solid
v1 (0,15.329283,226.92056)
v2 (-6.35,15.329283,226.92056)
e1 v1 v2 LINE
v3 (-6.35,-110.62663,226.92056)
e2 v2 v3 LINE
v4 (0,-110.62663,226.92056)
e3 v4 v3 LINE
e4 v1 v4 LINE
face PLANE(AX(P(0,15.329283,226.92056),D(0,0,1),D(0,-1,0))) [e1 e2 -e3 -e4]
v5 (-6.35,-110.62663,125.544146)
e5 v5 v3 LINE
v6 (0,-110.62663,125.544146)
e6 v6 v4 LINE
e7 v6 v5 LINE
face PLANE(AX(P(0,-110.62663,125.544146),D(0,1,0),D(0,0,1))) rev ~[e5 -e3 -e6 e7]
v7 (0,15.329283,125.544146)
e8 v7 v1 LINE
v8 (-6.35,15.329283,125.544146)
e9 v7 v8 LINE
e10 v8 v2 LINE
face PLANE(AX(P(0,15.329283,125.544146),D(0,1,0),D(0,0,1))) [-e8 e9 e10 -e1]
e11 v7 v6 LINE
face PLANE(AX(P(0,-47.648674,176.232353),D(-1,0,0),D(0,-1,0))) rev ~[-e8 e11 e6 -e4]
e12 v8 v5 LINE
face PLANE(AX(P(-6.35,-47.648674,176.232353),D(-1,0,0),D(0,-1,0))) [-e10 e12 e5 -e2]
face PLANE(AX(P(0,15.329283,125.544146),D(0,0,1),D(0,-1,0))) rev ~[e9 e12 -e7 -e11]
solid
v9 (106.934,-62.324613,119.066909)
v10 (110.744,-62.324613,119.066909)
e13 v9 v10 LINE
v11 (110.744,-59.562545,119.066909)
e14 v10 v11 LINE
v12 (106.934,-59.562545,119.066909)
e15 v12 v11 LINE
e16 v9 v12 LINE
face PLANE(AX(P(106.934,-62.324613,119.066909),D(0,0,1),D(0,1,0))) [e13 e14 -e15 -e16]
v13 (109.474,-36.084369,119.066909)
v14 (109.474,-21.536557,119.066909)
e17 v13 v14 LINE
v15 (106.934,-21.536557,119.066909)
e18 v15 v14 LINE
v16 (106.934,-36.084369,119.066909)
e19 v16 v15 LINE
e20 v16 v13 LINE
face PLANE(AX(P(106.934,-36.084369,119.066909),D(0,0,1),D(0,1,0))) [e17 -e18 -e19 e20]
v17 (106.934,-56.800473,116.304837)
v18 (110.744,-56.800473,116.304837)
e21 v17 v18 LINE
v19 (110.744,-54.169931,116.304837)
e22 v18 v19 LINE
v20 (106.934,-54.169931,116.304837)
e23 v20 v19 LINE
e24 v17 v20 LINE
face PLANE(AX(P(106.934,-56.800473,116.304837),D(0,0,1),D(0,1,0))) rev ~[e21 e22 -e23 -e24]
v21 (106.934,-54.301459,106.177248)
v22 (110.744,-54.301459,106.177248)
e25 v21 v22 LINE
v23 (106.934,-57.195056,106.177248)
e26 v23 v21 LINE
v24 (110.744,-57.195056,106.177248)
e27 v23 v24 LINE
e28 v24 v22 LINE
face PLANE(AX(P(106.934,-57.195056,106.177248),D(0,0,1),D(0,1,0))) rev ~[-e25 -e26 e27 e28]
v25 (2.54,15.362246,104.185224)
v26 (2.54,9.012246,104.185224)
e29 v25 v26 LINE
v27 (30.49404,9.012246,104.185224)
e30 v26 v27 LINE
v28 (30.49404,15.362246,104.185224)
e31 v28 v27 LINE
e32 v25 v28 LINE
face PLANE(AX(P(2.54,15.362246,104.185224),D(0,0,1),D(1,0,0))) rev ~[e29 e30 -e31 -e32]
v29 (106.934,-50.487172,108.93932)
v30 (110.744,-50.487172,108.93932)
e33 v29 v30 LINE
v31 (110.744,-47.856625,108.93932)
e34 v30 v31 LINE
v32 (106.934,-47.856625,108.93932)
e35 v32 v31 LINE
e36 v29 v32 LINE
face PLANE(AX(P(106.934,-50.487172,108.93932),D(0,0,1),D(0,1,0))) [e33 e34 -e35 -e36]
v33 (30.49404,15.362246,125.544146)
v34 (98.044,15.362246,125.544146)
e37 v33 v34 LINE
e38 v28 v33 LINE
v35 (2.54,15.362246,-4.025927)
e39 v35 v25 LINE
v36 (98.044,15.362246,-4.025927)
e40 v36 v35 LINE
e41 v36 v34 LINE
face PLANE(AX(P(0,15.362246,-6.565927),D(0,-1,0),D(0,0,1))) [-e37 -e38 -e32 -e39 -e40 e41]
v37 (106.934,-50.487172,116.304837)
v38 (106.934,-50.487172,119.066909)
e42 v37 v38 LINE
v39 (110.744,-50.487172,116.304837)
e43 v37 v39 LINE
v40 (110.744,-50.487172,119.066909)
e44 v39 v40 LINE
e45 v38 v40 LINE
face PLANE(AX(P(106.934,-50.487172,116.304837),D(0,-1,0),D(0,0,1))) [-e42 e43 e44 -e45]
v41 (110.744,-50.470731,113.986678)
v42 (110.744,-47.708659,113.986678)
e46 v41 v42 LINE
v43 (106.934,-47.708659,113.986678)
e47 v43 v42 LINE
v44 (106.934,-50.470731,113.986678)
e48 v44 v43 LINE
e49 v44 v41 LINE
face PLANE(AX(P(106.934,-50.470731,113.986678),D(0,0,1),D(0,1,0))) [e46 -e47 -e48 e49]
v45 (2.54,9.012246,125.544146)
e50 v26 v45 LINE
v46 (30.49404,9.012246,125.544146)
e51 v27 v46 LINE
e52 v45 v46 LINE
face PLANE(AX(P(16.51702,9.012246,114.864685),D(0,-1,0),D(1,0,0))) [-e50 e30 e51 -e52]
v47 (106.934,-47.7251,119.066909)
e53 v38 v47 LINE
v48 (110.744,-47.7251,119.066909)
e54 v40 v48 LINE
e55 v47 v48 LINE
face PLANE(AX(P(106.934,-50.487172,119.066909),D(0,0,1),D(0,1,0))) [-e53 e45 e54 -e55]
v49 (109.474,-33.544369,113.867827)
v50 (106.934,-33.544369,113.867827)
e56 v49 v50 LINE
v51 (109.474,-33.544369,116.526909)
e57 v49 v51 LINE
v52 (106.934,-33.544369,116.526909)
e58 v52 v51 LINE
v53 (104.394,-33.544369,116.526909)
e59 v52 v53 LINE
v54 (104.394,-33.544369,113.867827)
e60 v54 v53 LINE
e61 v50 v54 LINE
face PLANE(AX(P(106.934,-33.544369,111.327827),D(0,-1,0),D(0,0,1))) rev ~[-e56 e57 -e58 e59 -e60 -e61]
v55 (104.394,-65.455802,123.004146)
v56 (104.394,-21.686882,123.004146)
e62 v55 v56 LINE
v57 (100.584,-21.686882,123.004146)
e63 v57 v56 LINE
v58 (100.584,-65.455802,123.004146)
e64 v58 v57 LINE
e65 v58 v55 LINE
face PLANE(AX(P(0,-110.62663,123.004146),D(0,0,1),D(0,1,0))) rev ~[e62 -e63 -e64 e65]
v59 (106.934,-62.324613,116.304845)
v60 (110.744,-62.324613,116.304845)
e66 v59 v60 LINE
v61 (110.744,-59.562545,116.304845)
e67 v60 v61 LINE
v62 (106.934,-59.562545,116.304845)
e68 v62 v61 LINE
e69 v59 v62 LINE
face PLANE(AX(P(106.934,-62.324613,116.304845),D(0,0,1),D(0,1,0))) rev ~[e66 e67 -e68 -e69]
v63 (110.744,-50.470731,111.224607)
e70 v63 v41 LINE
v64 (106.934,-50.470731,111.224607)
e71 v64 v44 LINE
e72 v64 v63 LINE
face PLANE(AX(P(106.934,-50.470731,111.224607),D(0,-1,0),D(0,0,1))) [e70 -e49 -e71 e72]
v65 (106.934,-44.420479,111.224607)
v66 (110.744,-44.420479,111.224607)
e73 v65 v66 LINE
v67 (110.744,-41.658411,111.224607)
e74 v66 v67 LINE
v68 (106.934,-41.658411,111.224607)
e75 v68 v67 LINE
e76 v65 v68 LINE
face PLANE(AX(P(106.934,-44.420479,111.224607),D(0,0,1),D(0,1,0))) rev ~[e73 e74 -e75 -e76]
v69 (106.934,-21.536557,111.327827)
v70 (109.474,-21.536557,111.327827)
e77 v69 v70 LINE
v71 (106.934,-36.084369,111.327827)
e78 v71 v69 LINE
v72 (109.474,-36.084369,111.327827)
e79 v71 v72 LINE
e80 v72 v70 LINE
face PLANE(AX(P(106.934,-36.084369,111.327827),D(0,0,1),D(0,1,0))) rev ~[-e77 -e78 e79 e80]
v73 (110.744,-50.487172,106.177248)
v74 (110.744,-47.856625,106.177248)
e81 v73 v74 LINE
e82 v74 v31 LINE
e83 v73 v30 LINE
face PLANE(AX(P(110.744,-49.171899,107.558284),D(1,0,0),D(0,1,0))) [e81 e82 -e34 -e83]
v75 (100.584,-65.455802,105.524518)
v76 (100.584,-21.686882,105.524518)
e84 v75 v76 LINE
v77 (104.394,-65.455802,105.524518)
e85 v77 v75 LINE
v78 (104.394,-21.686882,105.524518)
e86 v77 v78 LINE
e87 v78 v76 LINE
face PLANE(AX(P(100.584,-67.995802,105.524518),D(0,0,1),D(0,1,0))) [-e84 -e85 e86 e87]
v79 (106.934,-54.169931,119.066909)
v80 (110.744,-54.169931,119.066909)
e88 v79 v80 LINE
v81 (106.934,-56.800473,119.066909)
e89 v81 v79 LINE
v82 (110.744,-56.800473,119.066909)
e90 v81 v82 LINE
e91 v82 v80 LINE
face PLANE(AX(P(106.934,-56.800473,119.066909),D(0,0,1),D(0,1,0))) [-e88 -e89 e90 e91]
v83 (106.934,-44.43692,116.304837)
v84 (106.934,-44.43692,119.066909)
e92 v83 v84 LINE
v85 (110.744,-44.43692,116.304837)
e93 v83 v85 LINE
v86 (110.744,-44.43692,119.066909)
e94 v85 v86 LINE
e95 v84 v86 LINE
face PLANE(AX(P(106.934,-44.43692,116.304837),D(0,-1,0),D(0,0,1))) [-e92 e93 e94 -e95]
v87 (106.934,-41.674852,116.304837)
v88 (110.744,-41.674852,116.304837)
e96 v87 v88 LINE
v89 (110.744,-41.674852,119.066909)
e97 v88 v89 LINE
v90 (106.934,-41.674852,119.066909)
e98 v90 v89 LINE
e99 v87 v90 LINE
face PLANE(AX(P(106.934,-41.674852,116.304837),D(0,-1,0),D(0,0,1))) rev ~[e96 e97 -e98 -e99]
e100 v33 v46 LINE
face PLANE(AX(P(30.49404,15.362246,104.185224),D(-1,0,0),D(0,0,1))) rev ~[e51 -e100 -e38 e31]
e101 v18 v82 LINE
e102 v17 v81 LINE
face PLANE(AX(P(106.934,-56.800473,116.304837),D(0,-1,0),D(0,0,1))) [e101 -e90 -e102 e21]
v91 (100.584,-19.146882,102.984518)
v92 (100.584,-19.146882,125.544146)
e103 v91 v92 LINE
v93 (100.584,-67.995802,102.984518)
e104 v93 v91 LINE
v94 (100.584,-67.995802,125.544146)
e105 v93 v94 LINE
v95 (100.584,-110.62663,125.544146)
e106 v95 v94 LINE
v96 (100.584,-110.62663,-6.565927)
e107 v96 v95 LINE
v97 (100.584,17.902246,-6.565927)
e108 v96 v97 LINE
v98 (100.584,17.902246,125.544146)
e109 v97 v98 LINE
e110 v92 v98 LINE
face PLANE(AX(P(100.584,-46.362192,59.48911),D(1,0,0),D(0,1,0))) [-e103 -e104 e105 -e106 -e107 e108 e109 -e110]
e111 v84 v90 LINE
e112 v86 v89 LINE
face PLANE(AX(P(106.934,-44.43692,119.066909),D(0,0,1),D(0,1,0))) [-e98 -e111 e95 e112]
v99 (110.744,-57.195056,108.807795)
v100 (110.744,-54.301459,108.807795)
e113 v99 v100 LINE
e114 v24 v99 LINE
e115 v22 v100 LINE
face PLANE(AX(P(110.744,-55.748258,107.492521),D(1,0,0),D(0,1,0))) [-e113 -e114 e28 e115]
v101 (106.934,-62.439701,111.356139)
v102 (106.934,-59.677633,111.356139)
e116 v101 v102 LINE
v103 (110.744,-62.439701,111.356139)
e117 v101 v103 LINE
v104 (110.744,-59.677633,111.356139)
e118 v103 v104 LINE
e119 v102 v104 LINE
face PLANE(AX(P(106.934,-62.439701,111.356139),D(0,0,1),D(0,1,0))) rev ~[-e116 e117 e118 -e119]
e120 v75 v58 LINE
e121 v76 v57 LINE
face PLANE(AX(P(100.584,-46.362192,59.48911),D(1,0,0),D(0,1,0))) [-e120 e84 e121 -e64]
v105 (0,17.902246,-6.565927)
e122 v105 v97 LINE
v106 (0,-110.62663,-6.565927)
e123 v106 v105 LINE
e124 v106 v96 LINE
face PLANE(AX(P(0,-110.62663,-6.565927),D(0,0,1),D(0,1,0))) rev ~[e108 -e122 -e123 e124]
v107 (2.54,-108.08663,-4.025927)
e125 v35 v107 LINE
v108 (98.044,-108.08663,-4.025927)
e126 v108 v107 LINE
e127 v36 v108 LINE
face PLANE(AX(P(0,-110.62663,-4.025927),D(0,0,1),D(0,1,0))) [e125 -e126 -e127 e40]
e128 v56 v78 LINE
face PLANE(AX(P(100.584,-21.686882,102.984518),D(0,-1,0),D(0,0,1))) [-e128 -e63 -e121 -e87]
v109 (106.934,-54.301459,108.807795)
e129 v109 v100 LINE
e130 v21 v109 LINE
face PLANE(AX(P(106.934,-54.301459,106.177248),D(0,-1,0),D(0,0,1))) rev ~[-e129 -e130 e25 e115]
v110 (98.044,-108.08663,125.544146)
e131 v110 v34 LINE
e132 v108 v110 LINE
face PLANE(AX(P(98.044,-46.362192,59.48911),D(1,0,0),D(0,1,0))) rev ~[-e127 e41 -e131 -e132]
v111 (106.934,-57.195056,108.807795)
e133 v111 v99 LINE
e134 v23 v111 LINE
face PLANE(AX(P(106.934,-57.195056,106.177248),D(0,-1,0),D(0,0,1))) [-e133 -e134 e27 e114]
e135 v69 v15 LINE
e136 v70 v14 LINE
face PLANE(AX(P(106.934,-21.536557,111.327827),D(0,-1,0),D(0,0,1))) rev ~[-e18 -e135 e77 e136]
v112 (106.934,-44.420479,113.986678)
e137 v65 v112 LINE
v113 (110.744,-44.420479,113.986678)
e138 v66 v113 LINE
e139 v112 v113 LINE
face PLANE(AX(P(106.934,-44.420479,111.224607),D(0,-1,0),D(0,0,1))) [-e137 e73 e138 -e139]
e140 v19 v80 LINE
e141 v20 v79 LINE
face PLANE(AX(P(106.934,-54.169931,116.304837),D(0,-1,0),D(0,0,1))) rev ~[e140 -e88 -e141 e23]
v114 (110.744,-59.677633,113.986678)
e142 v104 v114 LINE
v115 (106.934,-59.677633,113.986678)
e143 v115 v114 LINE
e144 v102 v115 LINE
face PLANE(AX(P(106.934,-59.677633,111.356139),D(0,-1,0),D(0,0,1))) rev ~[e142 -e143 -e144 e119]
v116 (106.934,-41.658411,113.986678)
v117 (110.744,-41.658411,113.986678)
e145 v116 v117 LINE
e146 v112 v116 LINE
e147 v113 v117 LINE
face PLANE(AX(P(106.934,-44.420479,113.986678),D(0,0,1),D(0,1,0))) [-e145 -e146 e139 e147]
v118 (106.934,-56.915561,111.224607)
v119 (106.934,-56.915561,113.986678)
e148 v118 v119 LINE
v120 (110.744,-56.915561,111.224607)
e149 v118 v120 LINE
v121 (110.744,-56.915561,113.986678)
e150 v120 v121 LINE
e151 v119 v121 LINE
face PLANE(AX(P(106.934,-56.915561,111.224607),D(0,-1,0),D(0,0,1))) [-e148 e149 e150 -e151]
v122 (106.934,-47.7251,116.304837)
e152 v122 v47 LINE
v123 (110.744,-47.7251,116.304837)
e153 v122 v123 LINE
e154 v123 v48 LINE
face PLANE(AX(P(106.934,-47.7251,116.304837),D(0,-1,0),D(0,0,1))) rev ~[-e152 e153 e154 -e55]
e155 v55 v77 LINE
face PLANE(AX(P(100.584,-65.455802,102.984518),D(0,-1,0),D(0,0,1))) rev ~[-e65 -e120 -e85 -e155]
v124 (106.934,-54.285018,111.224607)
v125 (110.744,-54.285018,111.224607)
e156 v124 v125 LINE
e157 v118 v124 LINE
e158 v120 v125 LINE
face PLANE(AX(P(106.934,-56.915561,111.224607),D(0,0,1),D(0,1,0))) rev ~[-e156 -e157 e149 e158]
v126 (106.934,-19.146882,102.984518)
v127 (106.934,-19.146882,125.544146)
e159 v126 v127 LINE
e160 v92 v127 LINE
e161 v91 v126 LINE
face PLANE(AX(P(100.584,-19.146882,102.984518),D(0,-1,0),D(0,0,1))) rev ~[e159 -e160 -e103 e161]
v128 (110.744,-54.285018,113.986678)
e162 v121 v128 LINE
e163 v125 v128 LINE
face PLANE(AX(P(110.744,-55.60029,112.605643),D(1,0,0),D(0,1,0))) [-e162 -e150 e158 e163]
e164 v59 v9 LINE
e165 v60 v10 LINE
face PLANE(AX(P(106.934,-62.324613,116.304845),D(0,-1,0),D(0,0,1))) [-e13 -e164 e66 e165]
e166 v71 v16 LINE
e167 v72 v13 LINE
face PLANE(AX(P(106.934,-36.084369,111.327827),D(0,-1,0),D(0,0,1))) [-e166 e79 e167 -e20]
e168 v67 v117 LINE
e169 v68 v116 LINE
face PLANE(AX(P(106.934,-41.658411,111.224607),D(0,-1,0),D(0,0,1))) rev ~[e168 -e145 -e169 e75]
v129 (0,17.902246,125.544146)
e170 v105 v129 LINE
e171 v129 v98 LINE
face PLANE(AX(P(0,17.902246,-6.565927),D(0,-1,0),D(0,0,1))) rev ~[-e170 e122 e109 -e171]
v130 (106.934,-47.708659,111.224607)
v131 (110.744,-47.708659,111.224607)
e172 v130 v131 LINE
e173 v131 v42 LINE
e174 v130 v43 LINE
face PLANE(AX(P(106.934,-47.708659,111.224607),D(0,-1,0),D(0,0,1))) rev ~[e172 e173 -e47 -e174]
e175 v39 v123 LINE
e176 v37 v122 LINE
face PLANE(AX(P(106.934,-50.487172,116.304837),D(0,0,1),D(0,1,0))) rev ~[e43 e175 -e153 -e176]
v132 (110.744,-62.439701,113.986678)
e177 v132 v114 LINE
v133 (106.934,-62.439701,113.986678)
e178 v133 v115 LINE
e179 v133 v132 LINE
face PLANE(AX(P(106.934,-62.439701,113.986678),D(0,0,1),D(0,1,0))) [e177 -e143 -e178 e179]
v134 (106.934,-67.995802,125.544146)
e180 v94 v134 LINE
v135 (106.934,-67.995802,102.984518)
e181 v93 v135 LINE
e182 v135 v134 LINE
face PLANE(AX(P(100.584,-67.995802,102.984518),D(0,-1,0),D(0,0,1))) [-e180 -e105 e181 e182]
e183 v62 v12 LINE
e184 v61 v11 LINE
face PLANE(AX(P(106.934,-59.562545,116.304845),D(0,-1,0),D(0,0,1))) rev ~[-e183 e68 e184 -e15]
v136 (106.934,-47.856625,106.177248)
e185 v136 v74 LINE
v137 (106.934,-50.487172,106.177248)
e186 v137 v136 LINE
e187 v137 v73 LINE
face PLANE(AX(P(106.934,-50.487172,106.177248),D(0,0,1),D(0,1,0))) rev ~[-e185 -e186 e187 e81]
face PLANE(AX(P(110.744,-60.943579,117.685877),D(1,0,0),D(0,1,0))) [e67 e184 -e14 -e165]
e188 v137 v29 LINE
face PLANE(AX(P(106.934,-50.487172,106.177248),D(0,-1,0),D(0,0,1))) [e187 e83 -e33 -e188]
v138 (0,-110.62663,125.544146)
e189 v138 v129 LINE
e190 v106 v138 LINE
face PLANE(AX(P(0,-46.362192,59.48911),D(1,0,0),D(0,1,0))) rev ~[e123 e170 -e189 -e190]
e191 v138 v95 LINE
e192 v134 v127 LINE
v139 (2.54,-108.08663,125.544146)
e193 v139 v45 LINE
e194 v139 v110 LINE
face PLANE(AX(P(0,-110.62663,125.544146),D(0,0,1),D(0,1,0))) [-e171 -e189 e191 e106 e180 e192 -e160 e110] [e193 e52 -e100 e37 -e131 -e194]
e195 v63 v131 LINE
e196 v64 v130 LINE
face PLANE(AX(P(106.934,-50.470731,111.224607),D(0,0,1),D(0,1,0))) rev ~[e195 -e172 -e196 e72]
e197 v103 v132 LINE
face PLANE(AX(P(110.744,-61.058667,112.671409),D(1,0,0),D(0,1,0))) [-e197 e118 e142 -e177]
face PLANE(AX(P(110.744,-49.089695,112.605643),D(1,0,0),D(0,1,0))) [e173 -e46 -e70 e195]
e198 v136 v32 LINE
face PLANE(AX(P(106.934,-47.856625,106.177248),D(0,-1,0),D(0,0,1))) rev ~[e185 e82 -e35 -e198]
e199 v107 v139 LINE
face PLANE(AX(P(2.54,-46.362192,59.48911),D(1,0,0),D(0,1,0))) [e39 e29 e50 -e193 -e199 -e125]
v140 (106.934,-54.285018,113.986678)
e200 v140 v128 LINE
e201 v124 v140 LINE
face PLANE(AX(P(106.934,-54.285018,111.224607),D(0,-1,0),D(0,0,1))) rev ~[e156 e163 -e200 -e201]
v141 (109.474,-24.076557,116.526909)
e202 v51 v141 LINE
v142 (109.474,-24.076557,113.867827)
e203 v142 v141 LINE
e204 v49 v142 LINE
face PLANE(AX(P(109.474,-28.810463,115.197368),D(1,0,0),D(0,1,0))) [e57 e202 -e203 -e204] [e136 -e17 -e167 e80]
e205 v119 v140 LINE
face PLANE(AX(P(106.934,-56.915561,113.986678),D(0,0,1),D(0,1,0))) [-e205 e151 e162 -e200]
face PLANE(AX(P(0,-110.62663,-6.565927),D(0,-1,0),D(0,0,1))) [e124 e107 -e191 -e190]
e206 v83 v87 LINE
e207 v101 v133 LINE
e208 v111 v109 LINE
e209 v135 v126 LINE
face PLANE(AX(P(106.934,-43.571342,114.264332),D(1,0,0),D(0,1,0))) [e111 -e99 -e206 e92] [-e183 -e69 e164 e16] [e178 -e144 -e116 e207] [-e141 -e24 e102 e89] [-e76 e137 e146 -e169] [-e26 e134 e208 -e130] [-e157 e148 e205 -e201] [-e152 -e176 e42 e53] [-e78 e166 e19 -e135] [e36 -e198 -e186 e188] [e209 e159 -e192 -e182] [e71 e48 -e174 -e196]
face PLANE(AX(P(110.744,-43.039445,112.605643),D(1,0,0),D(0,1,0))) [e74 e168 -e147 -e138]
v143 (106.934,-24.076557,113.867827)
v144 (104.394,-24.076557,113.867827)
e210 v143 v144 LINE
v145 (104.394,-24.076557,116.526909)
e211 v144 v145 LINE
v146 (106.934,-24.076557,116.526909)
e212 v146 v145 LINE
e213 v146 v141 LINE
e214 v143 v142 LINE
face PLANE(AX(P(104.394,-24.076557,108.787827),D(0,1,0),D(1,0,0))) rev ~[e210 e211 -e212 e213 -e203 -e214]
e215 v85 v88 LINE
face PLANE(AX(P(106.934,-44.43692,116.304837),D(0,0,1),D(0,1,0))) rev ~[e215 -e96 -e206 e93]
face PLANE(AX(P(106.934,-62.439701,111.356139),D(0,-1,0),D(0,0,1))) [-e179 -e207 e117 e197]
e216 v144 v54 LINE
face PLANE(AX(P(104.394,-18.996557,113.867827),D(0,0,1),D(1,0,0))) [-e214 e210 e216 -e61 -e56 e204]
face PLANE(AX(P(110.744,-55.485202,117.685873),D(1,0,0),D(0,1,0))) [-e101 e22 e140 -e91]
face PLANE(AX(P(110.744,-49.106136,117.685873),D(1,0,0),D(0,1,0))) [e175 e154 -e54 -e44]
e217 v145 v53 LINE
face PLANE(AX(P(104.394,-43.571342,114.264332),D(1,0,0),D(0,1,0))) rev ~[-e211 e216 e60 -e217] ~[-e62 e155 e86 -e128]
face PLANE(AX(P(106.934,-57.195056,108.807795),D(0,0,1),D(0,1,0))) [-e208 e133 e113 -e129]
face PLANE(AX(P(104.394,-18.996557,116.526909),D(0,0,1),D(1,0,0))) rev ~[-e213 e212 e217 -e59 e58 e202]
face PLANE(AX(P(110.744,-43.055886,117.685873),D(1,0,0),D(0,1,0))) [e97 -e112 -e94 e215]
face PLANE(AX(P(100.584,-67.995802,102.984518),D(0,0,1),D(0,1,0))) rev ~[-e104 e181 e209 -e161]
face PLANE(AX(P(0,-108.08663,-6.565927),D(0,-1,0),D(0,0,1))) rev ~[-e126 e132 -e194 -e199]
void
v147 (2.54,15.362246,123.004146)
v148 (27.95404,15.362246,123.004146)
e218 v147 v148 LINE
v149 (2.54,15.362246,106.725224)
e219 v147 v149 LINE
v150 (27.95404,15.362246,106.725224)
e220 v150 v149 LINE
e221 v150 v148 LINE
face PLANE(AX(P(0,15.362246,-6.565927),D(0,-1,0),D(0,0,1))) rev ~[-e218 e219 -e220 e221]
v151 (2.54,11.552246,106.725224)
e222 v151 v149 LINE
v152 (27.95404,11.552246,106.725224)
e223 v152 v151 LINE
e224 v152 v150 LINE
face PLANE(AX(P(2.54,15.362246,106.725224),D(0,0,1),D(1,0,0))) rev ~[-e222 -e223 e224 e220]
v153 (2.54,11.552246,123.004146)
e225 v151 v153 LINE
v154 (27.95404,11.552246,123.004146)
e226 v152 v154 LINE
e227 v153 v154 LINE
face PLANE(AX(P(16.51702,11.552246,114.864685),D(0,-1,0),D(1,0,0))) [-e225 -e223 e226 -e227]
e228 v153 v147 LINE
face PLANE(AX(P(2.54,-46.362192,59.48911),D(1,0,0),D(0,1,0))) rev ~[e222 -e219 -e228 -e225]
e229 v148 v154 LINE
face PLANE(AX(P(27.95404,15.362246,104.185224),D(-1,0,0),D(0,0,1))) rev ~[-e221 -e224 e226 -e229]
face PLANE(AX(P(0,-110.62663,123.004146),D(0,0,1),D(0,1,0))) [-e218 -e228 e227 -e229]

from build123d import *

# Parameters (mm, degrees)
F0_W          = 128.5288762301
F0_H          = 132.1100722998
F1_DEPTH      = 100.584
F2_T          = -2.54
F3_W          = 125.9559132159
F3_H          = 101.376414299
F4_DEPTH      = 6.35
F5_W          = 27.9540398782
F5_H          = 21.3589221239
F6_DEPTH      = 6.35
F7_W          = 48.8489195704
F7_H          = 22.5596278906
F8_DEPTH      = 6.35
F9_W          = 2.762068063
F9_H          = 2.7620643377
F9_W_2        = 2.6305429637
F9_H_2        = 2.7620717883
F9_W_3        = 2.7620717883
F9_W_4        = 2.630546689
F9_W_5        = 2.8935968876
F9_H_3        = 2.630546689
F9_H_4        = 2.6305392385
F10_DEPTH     = 3.81
F11_W         = 15.6517345458
F11_H         = 4.7349780798
F12_DEPTH     = 5.08
F13_W         = 14.5478118211
F13_H         = 7.7390819788
F14_DEPTH     = 2.54
F15_T         = 2.54
F15_T3_DEPTH  = 27.6396278906
F15_T5_DEPTH  = 53.9289195704
F15_T7_DEPTH  = 7.9735968876
F15_T9_DEPTH  = 7.710546689
F15_T11_DEPTH = 7.710546689
F15_T13_DEPTH = 7.8420717883
F15_T15_DEPTH = 7.7105429637
F15_T17_DEPTH = 7.8420717883
F15_T19_DEPTH = 7.8420717883
F15_T21_DEPTH = 7.842068063
F15_T23_DEPTH = 7.842068063
F15_T25_DEPTH = 7.7105392385
F15_T27_DEPTH = 7.842068063
F15_T29_DEPTH = 7.8420643377
F15_T31_DEPTH = 7.7105429637
F15_T33_DEPTH = 7.8420717883
F15_T35_DEPTH = 7.8420717883
F15_T37_DEPTH = 7.842068063
F15_T39_DEPTH = 19.6278118211
F15_T41_DEPTH = 12.8190819788
F15_T43_DEPTH = 134.6500722998
F15_T45_DEPTH = 100.584
F15_T47_DEPTH = 113.2911501759
F15_T49_DEPTH = 33.0340398782
F15_T51_DEPTH = 26.4389221239
F15_T53_DEPTH = 11.43
F15_T55_DEPTH = 128.5288762301


# Not quite as in the source:
# - a shell that OpenCascade refuses in one call is made with other operations: the cavity is built on its own and cut out


with BuildPart() as f1:
    # F0 (on Right) → F1 (new body)
    with BuildSketch(Plane.YZ):
        with Locations((-46.36219237, 59.4891095534)):
            Rectangle(F0_W, F0_H)
    extrude(amount=F1_DEPTH)

    # F2
    f2_openings = [f1.faces().sort_by_distance(p)[0] for p in [
        (50.292, -46.362192, 125.544146),
    ]]
    offset(amount=F2_T, openings=f2_openings)

    # F5 (on face) → F6 (join)
    with BuildSketch(Plane.XZ.offset(-15.3622457451)):
        with Locations((16.5170199391, 114.8646846414)):
            Rectangle(F5_W, F5_H)
    extrude(amount=F6_DEPTH)

    # F7 (on face) → F8 (join)
    with BuildSketch(Plane.YZ.offset(100.584)):
        with Locations((-43.5713417828, 114.264331758)):
            Rectangle(F7_W, F7_H)
    extrude(amount=F8_DEPTH)

    # F9 (on face) → F10 (join)
    with BuildSketch(Plane.YZ.offset(106.934)):
        with Locations((-60.9435793012, 117.6858767867)):
            Rectangle(F9_W, F9_H)
        with Locations((-55.4852019995, 117.6858730614)):
            Rectangle(F9_W_2, F9_H_2)
        with Locations((-49.1061359644, 117.6858730614)):
            Rectangle(F9_W_3, F9_H_2)
        with Locations((-43.0558864027, 117.6858730614)):
            Rectangle(F9_W, F9_H_2)
        with Locations((-43.0394452997, 112.6056425273)):
            Rectangle(F9_W, F9_H_2)
        with Locations((-49.0896948613, 112.6056425273)):
            Rectangle(F9_W_3, F9_H_2)
        with Locations((-49.171898514, 107.5582839549)):
            Rectangle(F9_W_4, F9_H_2)
        with Locations((-55.748257786, 107.4925214052)):
            Rectangle(F9_W_5, F9_H_3)
        with Locations((-55.600289721, 112.6056425273)):
            Rectangle(F9_W_2, F9_H_2)
        with Locations((-61.0586670227, 112.6714088023)):
            Rectangle(F9_W, F9_H_4)
    extrude(amount=F10_DEPTH)

    # F11 (on face) → F12 (join)
    with BuildSketch(Plane.YZ.offset(106.934)):
        with Locations((-28.7194242701, 116.8309524655)):
            Rectangle(F11_W, F11_H)
    extrude(amount=-F12_DEPTH)

    # F13 (on face) → F14 (join)
    with BuildSketch(Plane.YZ.offset(106.934)):
        with Locations((-28.8104629144, 115.1973679662)):
            Rectangle(F13_W, F13_H)
    extrude(amount=F14_DEPTH)

    # F15: shell of thickness 2.54, made by hand


with BuildPart() as f4:
    # F3 (on face) → F4 (new body)
    with BuildSketch(Plane(origin=(0, 0, 0), x_dir=(0, -1, 0), z_dir=(-1, 0, 0))):
        with Locations((47.6486738771, 176.2323528528)):
            Rectangle(F3_W, F3_H)
    extrude(amount=F4_DEPTH)


with BuildPart() as f15_core1:
    # F15_t2: copy of F1
    add(f1.part)

    # the walls: a layer under each face that stays
    f15_faces = [f15_core1.faces().sort_by_distance(p)[0] for p in [
        (50.292, -110.6266304851, 59.4891095534),
        (99.2958571429, 8.7216117286, 125.5441457033),
        (50.292, -46.36219237, -6.5659265965),
        (0, -46.36219237, 59.4891095534),
        (100.584, -46.36219237, 59.4891095534),
        (50.292, 17.9022457451, 59.4891095534),
        (103.759, -19.1468819976, 114.264331758),
        (106.934, -43.5713417828, 114.264331758),
        (103.759, -67.995801568, 114.264331758),
        (50.292, 15.3622457451, 60.7591095534),
        (30.4940398782, 12.1872457451, 114.8646846414),
        (16.5170199391, 9.0122457451, 114.8646846414),
        (2.54, -46.36219237, 60.7591095534),
        (50.292, -108.0866304851, 60.7591095534),
        (98.044, -46.36219237, 60.7591095534),
        (103.759, -43.5713417828, 102.9845178127),
        (108.839, -55.748257786, 108.8077947497),
        (108.839, -54.3014593422, 107.4925214052),
        (108.839, -57.1950562298, 107.4925214052),
        (108.839, -55.748257786, 106.1772480607),
        (108.839, -49.171898514, 108.939319849),
        (108.839, -47.8566251695, 107.5582839549),
        (108.839, -50.4871718585, 107.5582839549),
        (108.839, -49.171898514, 106.1772480607),
        (108.839, -55.600289721, 113.9866784215),
        (108.839, -54.2850182392, 112.6056425273),
        (108.839, -56.9155612029, 112.6056425273),
        (108.839, -55.600289721, 111.2246066332),
        (108.839, -49.0896948613, 113.9866784215),
        (108.839, -47.7086589672, 112.6056425273),
        (108.839, -50.4707307555, 112.6056425273),
        (108.839, -49.0896948613, 111.2246066332),
        (108.839, -43.0394452997, 113.9866784215),
        (108.839, -41.6584112681, 112.6056425273),
        (108.839, -44.4204793312, 112.6056425273),
        (108.839, -43.0394452997, 111.2246066332),
        (108.839, -61.0586670227, 111.356139183),
        (108.839, -62.4397010542, 112.6714088023),
        (108.839, -59.6776329912, 112.6714088023),
        (108.839, -61.0586670227, 113.9866784215),
        (108.839, -60.9435793012, 119.0669089556),
        (108.839, -59.5625452697, 117.6858767867),
        (108.839, -62.3246133327, 117.6858767867),
        (108.839, -60.9435793012, 116.3048446178),
        (108.839, -55.4852019995, 119.0669089556),
        (108.839, -54.1699305177, 117.6858730614),
        (108.839, -56.8004734814, 117.6858730614),
        (108.839, -55.4852019995, 116.3048371673),
        (108.839, -49.1061359644, 119.0669089556),
        (108.839, -47.7251000702, 117.6858730614),
        (108.839, -50.4871718585, 117.6858730614),
        (108.839, -49.1061359644, 116.3048371673),
        (108.839, -43.0558864027, 119.0669089556),
        (108.839, -41.6748523712, 117.6858730614),
        (108.839, -44.4369204342, 117.6858730614),
        (108.839, -43.0558864027, 116.3048371673),
        (108.204, -28.8104629144, 119.0669089556),
        (108.204, -36.084368825, 115.1973679662),
        (108.204, -28.8104629144, 111.3278269768),
        (108.204, -21.5365570039, 115.1973679662),
        (50.292, -46.36219237, -4.0259265965),
        (16.5170199391, 12.1872457451, 104.1852235794),
        (110.744, -55.748257786, 107.4925214052),
        (110.744, -49.171898514, 107.5582839549),
        (110.744, -55.600289721, 112.6056425273),
        (110.744, -49.0896948613, 112.6056425273),
        (110.744, -43.0394452997, 112.6056425273),
        (110.744, -61.0586670227, 112.6714088023),
        (110.744, -60.9435793012, 117.6858767867),
        (110.744, -55.4852019995, 117.6858730614),
        (110.744, -49.1061359644, 117.6858730614),
        (110.744, -43.0558864027, 117.6858730614),
    ]]
    thicken(f15_faces, amount=-F15_T, mode=Mode.SUBTRACT)

    # F15_s4 → F15_t3 (cut)
    with BuildSketch(Plane.XY.offset(100.4445178127)):
        Polygon((100.6094, -68.021201568), (98.044, -67.995801568), (98.044, -65.455801568), (100.584, -65.455801568), align=None)
        Polygon((100.6094, -19.1214819976), (98.044, -19.1468819976), (98.044, -21.6868819976), (100.584, -21.6868819976), align=None)
    extrude(amount=F15_T3_DEPTH, mode=Mode.SUBTRACT)

    # F15_s6 → F15_t5 (cut)
    with BuildSketch(Plane.XZ.offset(16.6068819976)):
        Polygon((100.6094, 102.9591178127), (98.044, 102.9845178127), (98.044, 105.5245178127), (100.584, 105.5245178127), align=None)
    extrude(amount=F15_T5_DEPTH, mode=Mode.SUBTRACT)

    # F15_s8 → F15_t7 (cut)
    with BuildSketch(Plane.XZ.offset(51.7614593422)):
        Polygon((106.9594, 108.8331947497), (104.394, 108.8077947497), (104.394, 106.2677947497), (106.934, 106.2677947497), align=None)
        Polygon((106.9594, 106.1518480607), (104.394, 106.1772480607), (104.394, 108.7172480607), (106.934, 108.7172480607), align=None)
    extrude(amount=F15_T7_DEPTH, mode=Mode.SUBTRACT)

    # F15_s10 → F15_t9 (cut)
    with BuildSketch(Plane.XY.offset(103.6372480607)):
        Polygon((106.9594, -54.2760593422), (104.394, -54.3014593422), (104.394, -56.8414593422), (106.934, -56.8414593422), align=None)
        Polygon((106.9594, -57.2204562298), (104.394, -57.1950562298), (104.394, -54.6550562298), (106.934, -54.6550562298), align=None)
    extrude(amount=F15_T9_DEPTH, mode=Mode.SUBTRACT)

    # F15_s12 → F15_t11 (cut)
    with BuildSketch(Plane.XZ.offset(45.3166251695)):
        Polygon((106.9594, 108.964719849), (104.394, 108.939319849), (104.394, 106.399319849), (106.934, 106.399319849), align=None)
        Polygon((106.9594, 106.1518480607), (104.394, 106.1772480607), (104.394, 108.7172480607), (106.934, 108.7172480607), align=None)
    extrude(amount=F15_T11_DEPTH, mode=Mode.SUBTRACT)

    # F15_s14 → F15_t13 (cut)
    with BuildSketch(Plane.XY.offset(103.6372480607)):
        Polygon((106.9594, -47.8312251695), (104.394, -47.8566251695), (104.394, -50.3966251695), (106.934, -50.3966251695), align=None)
        Polygon((106.9594, -50.5125718585), (104.394, -50.4871718585), (104.394, -47.9471718585), (106.934, -47.9471718585), align=None)
    extrude(amount=F15_T13_DEPTH, mode=Mode.SUBTRACT)

    # F15_s16 → F15_t15 (cut)
    with BuildSketch(Plane.XZ.offset(51.7450182392)):
        Polygon((106.9594, 114.0120784215), (104.394, 113.9866784215), (104.394, 111.4466784215), (106.934, 111.4466784215), align=None)
        Polygon((106.9594, 111.1992066332), (104.394, 111.2246066332), (104.394, 113.7646066332), (106.934, 113.7646066332), align=None)
    extrude(amount=F15_T15_DEPTH, mode=Mode.SUBTRACT)

    # F15_s18 → F15_t17 (cut)
    with BuildSketch(Plane.XY.offset(108.6846066332)):
        Polygon((106.9594, -54.2596182392), (104.394, -54.2850182392), (104.394, -56.8250182392), (106.934, -56.8250182392), align=None)
        Polygon((106.9594, -56.9409612029), (104.394, -56.9155612029), (104.394, -54.3755612029), (106.934, -54.3755612029), align=None)
        Polygon((106.9594, -47.6832589672), (104.394, -47.7086589672), (104.394, -50.2486589672), (106.934, -50.2486589672), align=None)
        Polygon((106.9594, -50.4961307555), (104.394, -50.4707307555), (104.394, -47.9307307555), (106.934, -47.9307307555), align=None)
        Polygon((106.9594, -41.6330112681), (104.394, -41.6584112681), (104.394, -44.1984112681), (106.934, -44.1984112681), align=None)
        Polygon((106.9594, -44.4458793312), (104.394, -44.4204793312), (104.394, -41.8804793312), (106.934, -41.8804793312), align=None)
    extrude(amount=F15_T17_DEPTH, mode=Mode.SUBTRACT)

    # F15_s20 → F15_t19 (cut)
    with BuildSketch(Plane.XZ.offset(45.1686589672)):
        Polygon((106.9594, 114.0120784215), (104.394, 113.9866784215), (104.394, 111.4466784215), (106.934, 111.4466784215), align=None)
        Polygon((106.9594, 111.1992066332), (104.394, 111.2246066332), (104.394, 113.7646066332), (106.934, 113.7646066332), align=None)
    extrude(amount=F15_T19_DEPTH, mode=Mode.SUBTRACT)

    # F15_s22 → F15_t21 (cut)
    with BuildSketch(Plane.XZ.offset(39.1184112681)):
        Polygon((106.9594, 114.0120784215), (104.394, 113.9866784215), (104.394, 111.4466784215), (106.934, 111.4466784215), align=None)
        Polygon((106.9594, 111.1992066332), (104.394, 111.2246066332), (104.394, 113.7646066332), (106.934, 113.7646066332), align=None)
    extrude(amount=F15_T21_DEPTH, mode=Mode.SUBTRACT)

    # F15_s24 → F15_t23 (cut)
    with BuildSketch(Plane.XZ.offset(57.1376329912)):
        Polygon((106.9594, 111.330739183), (104.394, 111.356139183), (104.394, 113.896139183), (106.934, 113.896139183), align=None)
        Polygon((106.9594, 114.0120784215), (104.394, 113.9866784215), (104.394, 111.4466784215), (106.934, 111.4466784215), align=None)
    extrude(amount=F15_T23_DEPTH, mode=Mode.SUBTRACT)

    # F15_s26 → F15_t25 (cut)
    with BuildSketch(Plane.XY.offset(108.816139183)):
        Polygon((106.9594, -62.4651010542), (104.394, -62.4397010542), (104.394, -59.8997010542), (106.934, -59.8997010542), align=None)
        Polygon((106.9594, -59.6522329912), (104.394, -59.6776329912), (104.394, -62.2176329912), (106.934, -62.2176329912), align=None)
    extrude(amount=F15_T25_DEPTH, mode=Mode.SUBTRACT)

    # F15_s28 → F15_t27 (cut)
    with BuildSketch(Plane.XZ.offset(57.0225452697)):
        Polygon((106.9594, 119.0923089556), (104.394, 119.0669089556), (104.394, 116.5269089556), (106.934, 116.5269089556), align=None)
        Polygon((106.9594, 116.2794446178), (104.394, 116.3048446178), (104.394, 118.8448446178), (106.934, 118.8448446178), align=None)
    extrude(amount=F15_T27_DEPTH, mode=Mode.SUBTRACT)

    # F15_s30 → F15_t29 (cut)
    with BuildSketch(Plane.XY.offset(113.7648446178)):
        Polygon((106.9594, -59.5371452697), (104.394, -59.5625452697), (104.394, -62.1025452697), (106.934, -62.1025452697), align=None)
        Polygon((106.9594, -62.3500133327), (104.394, -62.3246133327), (104.394, -59.7846133327), (106.934, -59.7846133327), align=None)
    extrude(amount=F15_T29_DEPTH, mode=Mode.SUBTRACT)

    # F15_s32 → F15_t31 (cut)
    with BuildSketch(Plane.XZ.offset(51.6299305177)):
        Polygon((106.9594, 119.0923089556), (104.394, 119.0669089556), (104.394, 116.5269089556), (106.934, 116.5269089556), align=None)
        Polygon((106.9594, 116.2794371673), (104.394, 116.3048371673), (104.394, 118.8448371673), (106.934, 118.8448371673), align=None)
    extrude(amount=F15_T31_DEPTH, mode=Mode.SUBTRACT)

    # F15_s34 → F15_t33 (cut)
    with BuildSketch(Plane.XY.offset(113.7648371673)):
        Polygon((106.9594, -54.1445305177), (104.394, -54.1699305177), (104.394, -56.7099305177), (106.934, -56.7099305177), align=None)
        Polygon((106.9594, -56.8258734814), (104.394, -56.8004734814), (104.394, -54.2604734814), (106.934, -54.2604734814), align=None)
        Polygon((106.9594, -47.6997000702), (104.394, -47.7251000702), (104.394, -50.2651000702), (106.934, -50.2651000702), align=None)
        Polygon((106.9594, -50.5125718585), (104.394, -50.4871718585), (104.394, -47.9471718585), (106.934, -47.9471718585), align=None)
        Polygon((106.9594, -41.6494523712), (104.394, -41.6748523712), (104.394, -44.2148523712), (106.934, -44.2148523712), align=None)
        Polygon((106.9594, -44.4623204342), (104.394, -44.4369204342), (104.394, -41.8969204342), (106.934, -41.8969204342), align=None)
    extrude(amount=F15_T33_DEPTH, mode=Mode.SUBTRACT)

    # F15_s36 → F15_t35 (cut)
    with BuildSketch(Plane.XZ.offset(45.1851000702)):
        Polygon((106.9594, 119.0923089556), (104.394, 119.0669089556), (104.394, 116.5269089556), (106.934, 116.5269089556), align=None)
        Polygon((106.9594, 116.2794371673), (104.394, 116.3048371673), (104.394, 118.8448371673), (106.934, 118.8448371673), align=None)
    extrude(amount=F15_T35_DEPTH, mode=Mode.SUBTRACT)

    # F15_s38 → F15_t37 (cut)
    with BuildSketch(Plane.XZ.offset(39.1348523712)):
        Polygon((106.9594, 119.0923089556), (104.394, 119.0669089556), (104.394, 116.5269089556), (106.934, 116.5269089556), align=None)
        Polygon((106.9594, 116.2794371673), (104.394, 116.3048371673), (104.394, 118.8448371673), (106.934, 118.8448371673), align=None)
    extrude(amount=F15_T37_DEPTH, mode=Mode.SUBTRACT)

    # F15_s40 → F15_t39 (cut)
    with BuildSketch(Plane.XZ.offset(18.9965570039)):
        Polygon((106.9594, 119.0923089556), (104.394, 119.0669089556), (104.394, 116.5269089556), (106.934, 116.5269089556), align=None)
        Polygon((106.9594, 111.3024269768), (104.394, 111.3278269768), (104.394, 113.8678269768), (106.934, 113.8678269768), align=None)
    extrude(amount=F15_T39_DEPTH, mode=Mode.SUBTRACT)

    # F15_s42 → F15_t41 (cut)
    with BuildSketch(Plane.XY.offset(108.7878269768)):
        Polygon((106.9594, -36.109768825), (104.394, -36.084368825), (104.394, -33.544368825), (106.934, -33.544368825), align=None)
        Polygon((106.9594, -21.5111570039), (104.394, -21.5365570039), (104.394, -24.0765570039), (106.934, -24.0765570039), align=None)
    extrude(amount=F15_T41_DEPTH, mode=Mode.SUBTRACT)

    # F15_s44 → F15_t43 (cut)
    with BuildSketch(Plane.XY.offset(-6.5659265965)):
        Polygon((98.0186, 15.3368457451), (98.044, 17.9022457451), (100.584, 17.9022457451), (100.584, 15.3622457451), align=None)
        Polygon((2.5654, -108.0612304851), (0, -108.0866304851), (0, -110.6266304851), (2.54, -110.6266304851), align=None)
        Polygon((98.0186, -108.0612304851), (98.044, -110.6266304851), (100.584, -110.6266304851), (100.584, -108.0866304851), align=None)
    extrude(amount=F15_T43_DEPTH, mode=Mode.SUBTRACT)

    # F15_s46 → F15_t45 (cut)
    with BuildSketch(Plane.YZ):
        Polygon((15.3368457451, -4.0005265965), (17.9022457451, -4.0259265965), (17.9022457451, -6.5659265965), (15.3622457451, -6.5659265965), align=None)
        Polygon((-108.0612304851, -4.0005265965), (-110.6266304851, -4.0259265965), (-110.6266304851, -6.5659265965), (-108.0866304851, -6.5659265965), align=None)
    extrude(amount=F15_T45_DEPTH, mode=Mode.SUBTRACT)

    # F15_s48 → F15_t47 (cut)
    with BuildSketch(Plane.XY.offset(-6.5659265965)):
        Polygon((2.5654, 15.3368457451), (2.54, 17.9022457451), (0, 17.9022457451), (0, 15.3622457451), align=None)
    extrude(amount=F15_T47_DEPTH, mode=Mode.SUBTRACT)

    # F15_s50 → F15_t49 (cut)
    with BuildSketch(Plane.YZ):
        Polygon((15.3368457451, 104.1598235794), (17.9022457451, 104.1852235794), (17.9022457451, 106.7252235794), (15.3622457451, 106.7252235794), align=None)
    extrude(amount=F15_T49_DEPTH, mode=Mode.SUBTRACT)

    # F15_s52 → F15_t51 (cut)
    with BuildSketch(Plane.XY.offset(101.6452235794)):
        Polygon((30.5194398782, 15.3368457451), (30.4940398782, 17.9022457451), (27.9540398782, 17.9022457451), (27.9540398782, 15.3622457451), align=None)
        Polygon((2.5654, 8.9868457451), (2.54, 11.5522457451), (0, 11.5522457451), (0, 9.0122457451), align=None)
    extrude(amount=F15_T51_DEPTH, mode=Mode.SUBTRACT)

    # F15_s54 → F15_t53 (cut)
    with BuildSketch(Plane.XZ.offset(-17.9022457451)):
        Polygon((2.5654, 104.1598235794), (0, 104.1852235794), (0, 106.7252235794), (2.54, 106.7252235794), align=None)
    extrude(amount=F15_T53_DEPTH, mode=Mode.SUBTRACT)

    # F15_s56 → F15_t55 (cut)
    with BuildSketch(Plane.XZ.offset(-17.9022457451)):
        Polygon((2.5654, -4.0005265965), (0, -4.0259265965), (0, -6.5659265965), (2.54, -6.5659265965), align=None)
        Polygon((98.0186, -4.0005265965), (100.584, -4.0259265965), (100.584, -6.5659265965), (98.044, -6.5659265965), align=None)
    extrude(amount=F15_T55_DEPTH, mode=Mode.SUBTRACT)


with BuildPart() as f1_1:
    add(f1.part)

    # what is left inside the walls is the cavity
    f15_cavity = [f15_core1.part.solids().sort_by_distance(p)[0] for p in [
        (15.24702, 11.577646, 112.151531),
        (100.6094, -43.571342, 111.35106),
    ]]
    add(f15_cavity, mode=Mode.SUBTRACT)


solid = Compound([f4.part, f1_1.part])
